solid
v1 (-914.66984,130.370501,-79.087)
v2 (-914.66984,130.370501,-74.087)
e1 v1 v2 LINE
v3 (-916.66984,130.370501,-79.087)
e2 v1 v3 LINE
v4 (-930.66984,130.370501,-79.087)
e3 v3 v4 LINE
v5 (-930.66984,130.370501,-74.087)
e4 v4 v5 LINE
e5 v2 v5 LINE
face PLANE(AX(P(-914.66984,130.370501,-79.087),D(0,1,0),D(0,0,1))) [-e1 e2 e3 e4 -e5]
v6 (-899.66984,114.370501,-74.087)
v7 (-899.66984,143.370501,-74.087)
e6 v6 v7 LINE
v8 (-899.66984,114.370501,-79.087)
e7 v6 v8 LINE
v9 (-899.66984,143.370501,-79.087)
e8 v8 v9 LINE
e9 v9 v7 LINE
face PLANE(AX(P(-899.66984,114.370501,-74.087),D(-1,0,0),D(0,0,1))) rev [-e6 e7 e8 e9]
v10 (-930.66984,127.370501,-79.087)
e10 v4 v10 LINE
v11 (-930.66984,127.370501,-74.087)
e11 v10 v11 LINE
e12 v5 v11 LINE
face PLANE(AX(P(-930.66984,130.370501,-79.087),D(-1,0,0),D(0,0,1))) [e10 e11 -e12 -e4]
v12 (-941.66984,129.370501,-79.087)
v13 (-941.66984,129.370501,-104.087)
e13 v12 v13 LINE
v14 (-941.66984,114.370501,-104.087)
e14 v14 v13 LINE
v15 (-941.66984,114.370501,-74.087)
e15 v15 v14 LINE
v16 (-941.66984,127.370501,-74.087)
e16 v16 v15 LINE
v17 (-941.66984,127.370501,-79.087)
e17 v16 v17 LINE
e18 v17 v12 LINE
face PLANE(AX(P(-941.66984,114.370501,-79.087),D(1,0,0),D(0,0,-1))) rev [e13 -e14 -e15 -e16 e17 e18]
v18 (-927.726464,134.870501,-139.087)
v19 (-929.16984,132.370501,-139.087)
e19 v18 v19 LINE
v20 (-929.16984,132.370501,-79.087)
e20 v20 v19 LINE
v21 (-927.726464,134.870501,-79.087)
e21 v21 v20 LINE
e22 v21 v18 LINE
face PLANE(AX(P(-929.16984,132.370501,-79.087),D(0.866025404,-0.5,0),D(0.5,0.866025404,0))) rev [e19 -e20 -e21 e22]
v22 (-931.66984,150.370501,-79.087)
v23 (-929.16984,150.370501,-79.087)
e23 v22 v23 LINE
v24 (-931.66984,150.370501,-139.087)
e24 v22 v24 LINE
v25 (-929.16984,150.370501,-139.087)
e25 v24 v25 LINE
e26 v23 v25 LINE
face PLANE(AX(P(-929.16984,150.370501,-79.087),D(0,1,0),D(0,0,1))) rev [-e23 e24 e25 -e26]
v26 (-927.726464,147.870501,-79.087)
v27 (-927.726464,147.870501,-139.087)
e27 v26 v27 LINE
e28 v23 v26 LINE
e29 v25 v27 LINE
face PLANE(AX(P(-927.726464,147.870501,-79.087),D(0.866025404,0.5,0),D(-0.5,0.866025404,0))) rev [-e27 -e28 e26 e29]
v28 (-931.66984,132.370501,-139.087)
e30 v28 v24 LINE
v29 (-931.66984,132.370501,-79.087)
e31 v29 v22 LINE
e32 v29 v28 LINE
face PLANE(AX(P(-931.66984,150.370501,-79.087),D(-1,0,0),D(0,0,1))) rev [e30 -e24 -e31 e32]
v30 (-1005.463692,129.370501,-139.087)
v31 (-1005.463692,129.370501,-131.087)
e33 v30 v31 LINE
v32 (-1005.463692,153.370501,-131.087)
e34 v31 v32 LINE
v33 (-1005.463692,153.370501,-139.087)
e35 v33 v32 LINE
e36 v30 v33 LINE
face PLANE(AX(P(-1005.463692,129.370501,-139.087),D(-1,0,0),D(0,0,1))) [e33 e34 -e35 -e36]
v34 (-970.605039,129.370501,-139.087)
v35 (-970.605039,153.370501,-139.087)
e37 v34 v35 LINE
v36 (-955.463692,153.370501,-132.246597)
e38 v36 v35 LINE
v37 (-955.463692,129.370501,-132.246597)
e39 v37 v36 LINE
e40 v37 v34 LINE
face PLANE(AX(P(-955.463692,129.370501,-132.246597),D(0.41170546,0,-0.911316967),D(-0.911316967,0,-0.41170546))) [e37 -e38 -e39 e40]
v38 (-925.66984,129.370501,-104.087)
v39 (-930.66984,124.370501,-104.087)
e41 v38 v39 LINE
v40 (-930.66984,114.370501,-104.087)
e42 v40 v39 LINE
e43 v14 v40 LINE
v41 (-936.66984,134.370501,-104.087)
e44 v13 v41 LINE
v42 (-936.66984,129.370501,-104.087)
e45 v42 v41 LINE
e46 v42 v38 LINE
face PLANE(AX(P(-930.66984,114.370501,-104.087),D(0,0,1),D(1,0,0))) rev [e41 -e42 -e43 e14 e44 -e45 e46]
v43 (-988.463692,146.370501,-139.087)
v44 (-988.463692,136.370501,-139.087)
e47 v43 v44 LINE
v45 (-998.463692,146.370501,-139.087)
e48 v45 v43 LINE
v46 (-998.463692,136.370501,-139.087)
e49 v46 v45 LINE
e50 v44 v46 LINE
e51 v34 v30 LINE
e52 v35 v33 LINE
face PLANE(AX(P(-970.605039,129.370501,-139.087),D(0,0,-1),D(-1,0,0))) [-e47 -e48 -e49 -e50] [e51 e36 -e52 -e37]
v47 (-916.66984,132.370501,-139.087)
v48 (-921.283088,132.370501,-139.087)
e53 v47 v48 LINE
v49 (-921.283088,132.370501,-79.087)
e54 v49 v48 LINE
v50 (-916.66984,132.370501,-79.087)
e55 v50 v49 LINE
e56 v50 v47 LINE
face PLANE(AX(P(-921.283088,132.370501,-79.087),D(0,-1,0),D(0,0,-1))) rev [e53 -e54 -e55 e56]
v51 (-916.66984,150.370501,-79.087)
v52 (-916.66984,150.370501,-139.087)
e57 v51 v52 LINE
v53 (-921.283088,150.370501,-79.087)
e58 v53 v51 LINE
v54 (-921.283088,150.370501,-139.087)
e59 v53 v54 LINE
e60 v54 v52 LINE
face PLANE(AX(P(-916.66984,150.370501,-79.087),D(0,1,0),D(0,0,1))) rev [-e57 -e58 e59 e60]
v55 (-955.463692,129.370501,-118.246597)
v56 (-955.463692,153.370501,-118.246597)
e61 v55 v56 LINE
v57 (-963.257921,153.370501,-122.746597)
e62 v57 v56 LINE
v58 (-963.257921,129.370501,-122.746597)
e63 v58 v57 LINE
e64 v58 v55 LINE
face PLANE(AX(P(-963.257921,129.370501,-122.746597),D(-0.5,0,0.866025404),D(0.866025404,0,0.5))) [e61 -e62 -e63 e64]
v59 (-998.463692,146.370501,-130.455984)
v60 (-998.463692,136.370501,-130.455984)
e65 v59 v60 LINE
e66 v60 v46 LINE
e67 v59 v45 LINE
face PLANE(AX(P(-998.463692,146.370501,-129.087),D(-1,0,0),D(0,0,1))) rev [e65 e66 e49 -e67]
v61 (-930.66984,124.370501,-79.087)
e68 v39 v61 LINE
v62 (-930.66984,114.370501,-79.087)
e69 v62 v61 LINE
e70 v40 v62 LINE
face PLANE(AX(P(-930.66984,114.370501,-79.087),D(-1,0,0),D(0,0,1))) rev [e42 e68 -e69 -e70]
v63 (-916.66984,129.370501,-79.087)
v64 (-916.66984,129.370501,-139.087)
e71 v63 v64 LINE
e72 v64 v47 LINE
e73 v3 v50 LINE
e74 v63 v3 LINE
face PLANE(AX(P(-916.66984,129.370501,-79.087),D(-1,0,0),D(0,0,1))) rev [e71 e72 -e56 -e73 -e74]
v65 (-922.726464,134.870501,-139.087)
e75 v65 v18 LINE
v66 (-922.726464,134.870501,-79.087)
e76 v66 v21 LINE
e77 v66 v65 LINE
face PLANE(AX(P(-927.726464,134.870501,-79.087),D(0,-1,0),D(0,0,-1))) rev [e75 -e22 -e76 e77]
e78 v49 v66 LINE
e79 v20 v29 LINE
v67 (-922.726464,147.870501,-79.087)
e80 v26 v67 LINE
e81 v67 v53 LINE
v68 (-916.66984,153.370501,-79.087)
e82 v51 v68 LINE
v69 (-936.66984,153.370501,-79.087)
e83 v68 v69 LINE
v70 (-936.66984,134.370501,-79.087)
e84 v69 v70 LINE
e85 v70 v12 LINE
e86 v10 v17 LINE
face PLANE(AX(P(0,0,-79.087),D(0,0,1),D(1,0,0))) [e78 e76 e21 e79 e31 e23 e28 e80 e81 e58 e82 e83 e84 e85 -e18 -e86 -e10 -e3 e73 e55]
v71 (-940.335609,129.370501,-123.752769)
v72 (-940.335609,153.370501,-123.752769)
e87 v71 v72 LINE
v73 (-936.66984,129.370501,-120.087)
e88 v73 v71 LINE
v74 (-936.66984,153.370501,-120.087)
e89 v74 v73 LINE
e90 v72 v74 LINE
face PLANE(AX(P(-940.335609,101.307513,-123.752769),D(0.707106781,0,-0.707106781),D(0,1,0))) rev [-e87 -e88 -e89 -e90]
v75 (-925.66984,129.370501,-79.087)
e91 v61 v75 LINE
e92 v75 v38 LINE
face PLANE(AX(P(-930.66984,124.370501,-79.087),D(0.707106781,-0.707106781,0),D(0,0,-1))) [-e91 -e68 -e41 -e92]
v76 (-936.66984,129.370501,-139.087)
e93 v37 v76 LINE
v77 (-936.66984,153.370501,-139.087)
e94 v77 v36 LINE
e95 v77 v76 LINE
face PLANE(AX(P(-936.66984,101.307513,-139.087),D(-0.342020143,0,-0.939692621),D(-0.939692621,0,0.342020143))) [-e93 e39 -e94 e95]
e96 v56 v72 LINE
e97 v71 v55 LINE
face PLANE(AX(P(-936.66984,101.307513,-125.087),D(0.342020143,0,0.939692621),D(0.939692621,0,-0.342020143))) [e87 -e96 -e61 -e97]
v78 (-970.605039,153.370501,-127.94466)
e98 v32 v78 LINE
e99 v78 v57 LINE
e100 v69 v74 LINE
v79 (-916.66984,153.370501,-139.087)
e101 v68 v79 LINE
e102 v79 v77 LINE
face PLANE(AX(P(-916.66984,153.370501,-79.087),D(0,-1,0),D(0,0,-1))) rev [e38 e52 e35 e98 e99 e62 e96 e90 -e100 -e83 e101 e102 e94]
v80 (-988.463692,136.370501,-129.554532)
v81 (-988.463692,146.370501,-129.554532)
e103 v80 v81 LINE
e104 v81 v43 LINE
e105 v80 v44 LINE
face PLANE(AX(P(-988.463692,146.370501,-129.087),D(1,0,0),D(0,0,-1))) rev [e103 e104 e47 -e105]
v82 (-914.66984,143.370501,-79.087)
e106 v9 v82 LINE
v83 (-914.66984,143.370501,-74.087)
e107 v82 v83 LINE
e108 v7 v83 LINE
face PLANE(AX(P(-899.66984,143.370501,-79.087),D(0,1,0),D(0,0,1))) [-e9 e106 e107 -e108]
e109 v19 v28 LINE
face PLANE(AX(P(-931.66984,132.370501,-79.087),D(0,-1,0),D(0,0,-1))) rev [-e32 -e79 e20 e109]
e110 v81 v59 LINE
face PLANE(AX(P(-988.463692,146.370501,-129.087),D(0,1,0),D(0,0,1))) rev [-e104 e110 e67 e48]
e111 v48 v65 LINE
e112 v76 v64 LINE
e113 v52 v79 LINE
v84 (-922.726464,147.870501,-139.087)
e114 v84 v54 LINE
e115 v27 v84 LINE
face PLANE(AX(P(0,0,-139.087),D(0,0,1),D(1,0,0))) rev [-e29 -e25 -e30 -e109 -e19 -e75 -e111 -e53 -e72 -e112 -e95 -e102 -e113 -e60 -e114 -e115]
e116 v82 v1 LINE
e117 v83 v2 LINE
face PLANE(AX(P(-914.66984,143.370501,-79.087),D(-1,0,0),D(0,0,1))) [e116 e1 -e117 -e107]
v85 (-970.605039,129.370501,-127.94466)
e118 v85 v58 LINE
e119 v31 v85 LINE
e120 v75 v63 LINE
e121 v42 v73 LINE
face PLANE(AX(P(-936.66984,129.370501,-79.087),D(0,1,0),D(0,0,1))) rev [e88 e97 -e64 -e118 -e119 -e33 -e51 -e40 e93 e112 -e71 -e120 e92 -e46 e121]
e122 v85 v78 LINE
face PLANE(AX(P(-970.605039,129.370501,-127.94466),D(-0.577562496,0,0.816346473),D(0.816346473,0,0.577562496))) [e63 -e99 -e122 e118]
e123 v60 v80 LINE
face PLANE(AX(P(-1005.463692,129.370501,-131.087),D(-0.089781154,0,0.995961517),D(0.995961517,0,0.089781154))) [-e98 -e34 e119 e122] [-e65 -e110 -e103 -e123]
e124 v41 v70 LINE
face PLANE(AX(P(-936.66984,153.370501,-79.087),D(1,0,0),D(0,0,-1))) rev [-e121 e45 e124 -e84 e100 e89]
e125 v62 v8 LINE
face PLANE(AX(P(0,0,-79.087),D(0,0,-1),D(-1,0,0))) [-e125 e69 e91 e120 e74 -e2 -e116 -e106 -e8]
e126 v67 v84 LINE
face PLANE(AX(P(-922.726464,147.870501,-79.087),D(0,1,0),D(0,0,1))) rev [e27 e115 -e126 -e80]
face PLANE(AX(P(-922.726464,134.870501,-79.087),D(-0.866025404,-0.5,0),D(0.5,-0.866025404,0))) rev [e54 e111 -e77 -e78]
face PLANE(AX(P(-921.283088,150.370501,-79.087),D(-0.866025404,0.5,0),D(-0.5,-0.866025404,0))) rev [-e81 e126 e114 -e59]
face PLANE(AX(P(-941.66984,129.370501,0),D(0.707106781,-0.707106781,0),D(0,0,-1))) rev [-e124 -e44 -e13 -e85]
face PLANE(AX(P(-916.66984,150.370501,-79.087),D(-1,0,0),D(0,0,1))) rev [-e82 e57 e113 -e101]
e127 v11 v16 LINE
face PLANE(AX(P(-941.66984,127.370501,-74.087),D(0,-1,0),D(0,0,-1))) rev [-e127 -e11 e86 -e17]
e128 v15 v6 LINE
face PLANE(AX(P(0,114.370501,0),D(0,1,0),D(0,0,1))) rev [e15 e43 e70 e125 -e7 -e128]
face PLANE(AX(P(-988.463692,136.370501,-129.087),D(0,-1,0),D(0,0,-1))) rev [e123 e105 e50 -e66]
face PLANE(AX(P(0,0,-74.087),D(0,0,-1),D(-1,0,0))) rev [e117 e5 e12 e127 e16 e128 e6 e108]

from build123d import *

# Parameters (mm, degrees)
BOSS_EXTRUDE1_DEPTH = 30
SKETCH2_W           = 11
SKETCH2_H           = 25
BOSS_EXTRUDE2_DEPTH = 15
CHAMFER1_SIZE       = 5
SKETCH3_W           = 42
SKETCH3_H           = 13
BOSS_EXTRUDE3_DEPTH = 5
BOSS_EXTRUDE4_DEPTH = 5
BOSS_EXTRUDE5_DEPTH = 24
CHAMFER2_SIZE       = 5
CHAMFER2_SIZE2      = 3.901030044
BOSS_EXTRUDE6_DEPTH = 24
SKETCH7_W           = 10
SKETCH7_H           = 10
CUT_EXTRUDE1_DEPTH  = 10


with BuildPart() as part:
    # Sketch1 → Boss-Extrude1 (new, symmetric)
    with BuildSketch(Plane.XY.offset(-109.087000354)):
        Polygon((-916.669839571, 150.370500968), (-916.669839571, 153.370500968), (-936.669839571, 153.370500968), (-936.669839571, 129.370500968), (-916.669839571, 129.370500968), (-916.669839571, 132.370500968), (-921.283088225, 132.370500968), (-922.726463898, 134.870500968), (-927.726463898, 134.870500968), (-929.169839571, 132.370500968), (-931.669839571, 132.370500968), (-931.669839571, 150.370500968), (-929.169839571, 150.370500968), (-927.726463898, 147.870500968), (-922.726463898, 147.870500968), (-921.283088225, 150.370500968), align=None)
    extrude(amount=BOSS_EXTRUDE1_DEPTH, both=True)

    # Sketch2 → Boss-Extrude2 (add)
    with BuildSketch(Plane.XZ.offset(-129.370500968)):
        with Locations((-936.169839571, -91.587000354)):
            Rectangle(SKETCH2_W, SKETCH2_H)
    extrude(amount=BOSS_EXTRUDE2_DEPTH)

    # Chamfer1
    chamfer1_edges = [part.edges().sort_by_distance(p)[0] for p in [
        (-936.669839571, 129.370500968, -91.587000354),
        (-930.669839571, 129.370500968, -91.587000354),
    ]]
    chamfer(chamfer1_edges, length=CHAMFER1_SIZE - 0.0001)  # a hair under: the kernel refuses the full size

    # Sketch3 → Boss-Extrude3 (add)
    with BuildSketch(Plane.XY.offset(-79.087000354)):
        with Locations((-920.669839571, 120.870500968)):
            Rectangle(SKETCH3_W, SKETCH3_H)
    extrude(amount=BOSS_EXTRUDE3_DEPTH)

    # Sketch4 → Boss-Extrude4 (add)
    with BuildSketch(Plane.XY.offset(-74.087000354)):
        Polygon((-899.669839571, 127.370500968), (-899.669839571, 143.370500968), (-914.669839571, 143.370500968), (-914.669839571, 130.370500968), (-930.669839571, 130.370500968), (-930.669839571, 127.370500968), align=None)
    extrude(amount=-BOSS_EXTRUDE4_DEPTH)

    # Sketch5 → Boss-Extrude5 (add)
    with BuildSketch(Plane(origin=(0, 153.370500968, 0), x_dir=(1, 0, 0), z_dir=(0, 1, 0))):
        Polygon((-936.669839571, 139.087000354), (-936.669839571, 125.087000354), (-955.463691986, 118.246597487), (-955.463691986, 132.246597487), align=None)
    extrude(amount=-BOSS_EXTRUDE5_DEPTH)

    # Chamfer2
    chamfer2_edges = [part.edges().sort_by_distance(p)[0] for p in [
        (-936.669839571, 141.370500968, -125.087000354),
    ]]
    chamfer2_side = [part.faces().sort_by_distance(p)[0] for p in [
        (-936.669839571, 142.583452416, -103.427623846),
    ]]
    chamfer(chamfer2_edges, length=CHAMFER2_SIZE, length2=CHAMFER2_SIZE2, reference=chamfer2_side[0])

    # Sketch6 → Boss-Extrude6 (add)
    with BuildSketch(Plane(origin=(0, 153.370500968, 0), x_dir=(1, 0, 0), z_dir=(0, 1, 0))):
        Polygon((-955.463691986, 132.246597487), (-970.605038874, 139.087000354), (-1005.463691986, 139.087000354), (-1005.463691986, 131.087000354), (-970.605038874, 127.94465995), (-963.25792062, 122.746597487), (-955.463691986, 118.246597487), align=None)
    extrude(amount=-BOSS_EXTRUDE6_DEPTH)

    # Sketch7 → Cut-Extrude1 (cut)
    with BuildSketch(Plane(origin=(0, 0, -139.087000354), x_dir=(-1, 0, 0), z_dir=(0, 0, -1))):
        with Locations((993.463691986, 141.370500968)):
            Rectangle(SKETCH7_W, SKETCH7_H)
    extrude(amount=-CUT_EXTRUDE1_DEPTH, mode=Mode.SUBTRACT)


solid = part.part
